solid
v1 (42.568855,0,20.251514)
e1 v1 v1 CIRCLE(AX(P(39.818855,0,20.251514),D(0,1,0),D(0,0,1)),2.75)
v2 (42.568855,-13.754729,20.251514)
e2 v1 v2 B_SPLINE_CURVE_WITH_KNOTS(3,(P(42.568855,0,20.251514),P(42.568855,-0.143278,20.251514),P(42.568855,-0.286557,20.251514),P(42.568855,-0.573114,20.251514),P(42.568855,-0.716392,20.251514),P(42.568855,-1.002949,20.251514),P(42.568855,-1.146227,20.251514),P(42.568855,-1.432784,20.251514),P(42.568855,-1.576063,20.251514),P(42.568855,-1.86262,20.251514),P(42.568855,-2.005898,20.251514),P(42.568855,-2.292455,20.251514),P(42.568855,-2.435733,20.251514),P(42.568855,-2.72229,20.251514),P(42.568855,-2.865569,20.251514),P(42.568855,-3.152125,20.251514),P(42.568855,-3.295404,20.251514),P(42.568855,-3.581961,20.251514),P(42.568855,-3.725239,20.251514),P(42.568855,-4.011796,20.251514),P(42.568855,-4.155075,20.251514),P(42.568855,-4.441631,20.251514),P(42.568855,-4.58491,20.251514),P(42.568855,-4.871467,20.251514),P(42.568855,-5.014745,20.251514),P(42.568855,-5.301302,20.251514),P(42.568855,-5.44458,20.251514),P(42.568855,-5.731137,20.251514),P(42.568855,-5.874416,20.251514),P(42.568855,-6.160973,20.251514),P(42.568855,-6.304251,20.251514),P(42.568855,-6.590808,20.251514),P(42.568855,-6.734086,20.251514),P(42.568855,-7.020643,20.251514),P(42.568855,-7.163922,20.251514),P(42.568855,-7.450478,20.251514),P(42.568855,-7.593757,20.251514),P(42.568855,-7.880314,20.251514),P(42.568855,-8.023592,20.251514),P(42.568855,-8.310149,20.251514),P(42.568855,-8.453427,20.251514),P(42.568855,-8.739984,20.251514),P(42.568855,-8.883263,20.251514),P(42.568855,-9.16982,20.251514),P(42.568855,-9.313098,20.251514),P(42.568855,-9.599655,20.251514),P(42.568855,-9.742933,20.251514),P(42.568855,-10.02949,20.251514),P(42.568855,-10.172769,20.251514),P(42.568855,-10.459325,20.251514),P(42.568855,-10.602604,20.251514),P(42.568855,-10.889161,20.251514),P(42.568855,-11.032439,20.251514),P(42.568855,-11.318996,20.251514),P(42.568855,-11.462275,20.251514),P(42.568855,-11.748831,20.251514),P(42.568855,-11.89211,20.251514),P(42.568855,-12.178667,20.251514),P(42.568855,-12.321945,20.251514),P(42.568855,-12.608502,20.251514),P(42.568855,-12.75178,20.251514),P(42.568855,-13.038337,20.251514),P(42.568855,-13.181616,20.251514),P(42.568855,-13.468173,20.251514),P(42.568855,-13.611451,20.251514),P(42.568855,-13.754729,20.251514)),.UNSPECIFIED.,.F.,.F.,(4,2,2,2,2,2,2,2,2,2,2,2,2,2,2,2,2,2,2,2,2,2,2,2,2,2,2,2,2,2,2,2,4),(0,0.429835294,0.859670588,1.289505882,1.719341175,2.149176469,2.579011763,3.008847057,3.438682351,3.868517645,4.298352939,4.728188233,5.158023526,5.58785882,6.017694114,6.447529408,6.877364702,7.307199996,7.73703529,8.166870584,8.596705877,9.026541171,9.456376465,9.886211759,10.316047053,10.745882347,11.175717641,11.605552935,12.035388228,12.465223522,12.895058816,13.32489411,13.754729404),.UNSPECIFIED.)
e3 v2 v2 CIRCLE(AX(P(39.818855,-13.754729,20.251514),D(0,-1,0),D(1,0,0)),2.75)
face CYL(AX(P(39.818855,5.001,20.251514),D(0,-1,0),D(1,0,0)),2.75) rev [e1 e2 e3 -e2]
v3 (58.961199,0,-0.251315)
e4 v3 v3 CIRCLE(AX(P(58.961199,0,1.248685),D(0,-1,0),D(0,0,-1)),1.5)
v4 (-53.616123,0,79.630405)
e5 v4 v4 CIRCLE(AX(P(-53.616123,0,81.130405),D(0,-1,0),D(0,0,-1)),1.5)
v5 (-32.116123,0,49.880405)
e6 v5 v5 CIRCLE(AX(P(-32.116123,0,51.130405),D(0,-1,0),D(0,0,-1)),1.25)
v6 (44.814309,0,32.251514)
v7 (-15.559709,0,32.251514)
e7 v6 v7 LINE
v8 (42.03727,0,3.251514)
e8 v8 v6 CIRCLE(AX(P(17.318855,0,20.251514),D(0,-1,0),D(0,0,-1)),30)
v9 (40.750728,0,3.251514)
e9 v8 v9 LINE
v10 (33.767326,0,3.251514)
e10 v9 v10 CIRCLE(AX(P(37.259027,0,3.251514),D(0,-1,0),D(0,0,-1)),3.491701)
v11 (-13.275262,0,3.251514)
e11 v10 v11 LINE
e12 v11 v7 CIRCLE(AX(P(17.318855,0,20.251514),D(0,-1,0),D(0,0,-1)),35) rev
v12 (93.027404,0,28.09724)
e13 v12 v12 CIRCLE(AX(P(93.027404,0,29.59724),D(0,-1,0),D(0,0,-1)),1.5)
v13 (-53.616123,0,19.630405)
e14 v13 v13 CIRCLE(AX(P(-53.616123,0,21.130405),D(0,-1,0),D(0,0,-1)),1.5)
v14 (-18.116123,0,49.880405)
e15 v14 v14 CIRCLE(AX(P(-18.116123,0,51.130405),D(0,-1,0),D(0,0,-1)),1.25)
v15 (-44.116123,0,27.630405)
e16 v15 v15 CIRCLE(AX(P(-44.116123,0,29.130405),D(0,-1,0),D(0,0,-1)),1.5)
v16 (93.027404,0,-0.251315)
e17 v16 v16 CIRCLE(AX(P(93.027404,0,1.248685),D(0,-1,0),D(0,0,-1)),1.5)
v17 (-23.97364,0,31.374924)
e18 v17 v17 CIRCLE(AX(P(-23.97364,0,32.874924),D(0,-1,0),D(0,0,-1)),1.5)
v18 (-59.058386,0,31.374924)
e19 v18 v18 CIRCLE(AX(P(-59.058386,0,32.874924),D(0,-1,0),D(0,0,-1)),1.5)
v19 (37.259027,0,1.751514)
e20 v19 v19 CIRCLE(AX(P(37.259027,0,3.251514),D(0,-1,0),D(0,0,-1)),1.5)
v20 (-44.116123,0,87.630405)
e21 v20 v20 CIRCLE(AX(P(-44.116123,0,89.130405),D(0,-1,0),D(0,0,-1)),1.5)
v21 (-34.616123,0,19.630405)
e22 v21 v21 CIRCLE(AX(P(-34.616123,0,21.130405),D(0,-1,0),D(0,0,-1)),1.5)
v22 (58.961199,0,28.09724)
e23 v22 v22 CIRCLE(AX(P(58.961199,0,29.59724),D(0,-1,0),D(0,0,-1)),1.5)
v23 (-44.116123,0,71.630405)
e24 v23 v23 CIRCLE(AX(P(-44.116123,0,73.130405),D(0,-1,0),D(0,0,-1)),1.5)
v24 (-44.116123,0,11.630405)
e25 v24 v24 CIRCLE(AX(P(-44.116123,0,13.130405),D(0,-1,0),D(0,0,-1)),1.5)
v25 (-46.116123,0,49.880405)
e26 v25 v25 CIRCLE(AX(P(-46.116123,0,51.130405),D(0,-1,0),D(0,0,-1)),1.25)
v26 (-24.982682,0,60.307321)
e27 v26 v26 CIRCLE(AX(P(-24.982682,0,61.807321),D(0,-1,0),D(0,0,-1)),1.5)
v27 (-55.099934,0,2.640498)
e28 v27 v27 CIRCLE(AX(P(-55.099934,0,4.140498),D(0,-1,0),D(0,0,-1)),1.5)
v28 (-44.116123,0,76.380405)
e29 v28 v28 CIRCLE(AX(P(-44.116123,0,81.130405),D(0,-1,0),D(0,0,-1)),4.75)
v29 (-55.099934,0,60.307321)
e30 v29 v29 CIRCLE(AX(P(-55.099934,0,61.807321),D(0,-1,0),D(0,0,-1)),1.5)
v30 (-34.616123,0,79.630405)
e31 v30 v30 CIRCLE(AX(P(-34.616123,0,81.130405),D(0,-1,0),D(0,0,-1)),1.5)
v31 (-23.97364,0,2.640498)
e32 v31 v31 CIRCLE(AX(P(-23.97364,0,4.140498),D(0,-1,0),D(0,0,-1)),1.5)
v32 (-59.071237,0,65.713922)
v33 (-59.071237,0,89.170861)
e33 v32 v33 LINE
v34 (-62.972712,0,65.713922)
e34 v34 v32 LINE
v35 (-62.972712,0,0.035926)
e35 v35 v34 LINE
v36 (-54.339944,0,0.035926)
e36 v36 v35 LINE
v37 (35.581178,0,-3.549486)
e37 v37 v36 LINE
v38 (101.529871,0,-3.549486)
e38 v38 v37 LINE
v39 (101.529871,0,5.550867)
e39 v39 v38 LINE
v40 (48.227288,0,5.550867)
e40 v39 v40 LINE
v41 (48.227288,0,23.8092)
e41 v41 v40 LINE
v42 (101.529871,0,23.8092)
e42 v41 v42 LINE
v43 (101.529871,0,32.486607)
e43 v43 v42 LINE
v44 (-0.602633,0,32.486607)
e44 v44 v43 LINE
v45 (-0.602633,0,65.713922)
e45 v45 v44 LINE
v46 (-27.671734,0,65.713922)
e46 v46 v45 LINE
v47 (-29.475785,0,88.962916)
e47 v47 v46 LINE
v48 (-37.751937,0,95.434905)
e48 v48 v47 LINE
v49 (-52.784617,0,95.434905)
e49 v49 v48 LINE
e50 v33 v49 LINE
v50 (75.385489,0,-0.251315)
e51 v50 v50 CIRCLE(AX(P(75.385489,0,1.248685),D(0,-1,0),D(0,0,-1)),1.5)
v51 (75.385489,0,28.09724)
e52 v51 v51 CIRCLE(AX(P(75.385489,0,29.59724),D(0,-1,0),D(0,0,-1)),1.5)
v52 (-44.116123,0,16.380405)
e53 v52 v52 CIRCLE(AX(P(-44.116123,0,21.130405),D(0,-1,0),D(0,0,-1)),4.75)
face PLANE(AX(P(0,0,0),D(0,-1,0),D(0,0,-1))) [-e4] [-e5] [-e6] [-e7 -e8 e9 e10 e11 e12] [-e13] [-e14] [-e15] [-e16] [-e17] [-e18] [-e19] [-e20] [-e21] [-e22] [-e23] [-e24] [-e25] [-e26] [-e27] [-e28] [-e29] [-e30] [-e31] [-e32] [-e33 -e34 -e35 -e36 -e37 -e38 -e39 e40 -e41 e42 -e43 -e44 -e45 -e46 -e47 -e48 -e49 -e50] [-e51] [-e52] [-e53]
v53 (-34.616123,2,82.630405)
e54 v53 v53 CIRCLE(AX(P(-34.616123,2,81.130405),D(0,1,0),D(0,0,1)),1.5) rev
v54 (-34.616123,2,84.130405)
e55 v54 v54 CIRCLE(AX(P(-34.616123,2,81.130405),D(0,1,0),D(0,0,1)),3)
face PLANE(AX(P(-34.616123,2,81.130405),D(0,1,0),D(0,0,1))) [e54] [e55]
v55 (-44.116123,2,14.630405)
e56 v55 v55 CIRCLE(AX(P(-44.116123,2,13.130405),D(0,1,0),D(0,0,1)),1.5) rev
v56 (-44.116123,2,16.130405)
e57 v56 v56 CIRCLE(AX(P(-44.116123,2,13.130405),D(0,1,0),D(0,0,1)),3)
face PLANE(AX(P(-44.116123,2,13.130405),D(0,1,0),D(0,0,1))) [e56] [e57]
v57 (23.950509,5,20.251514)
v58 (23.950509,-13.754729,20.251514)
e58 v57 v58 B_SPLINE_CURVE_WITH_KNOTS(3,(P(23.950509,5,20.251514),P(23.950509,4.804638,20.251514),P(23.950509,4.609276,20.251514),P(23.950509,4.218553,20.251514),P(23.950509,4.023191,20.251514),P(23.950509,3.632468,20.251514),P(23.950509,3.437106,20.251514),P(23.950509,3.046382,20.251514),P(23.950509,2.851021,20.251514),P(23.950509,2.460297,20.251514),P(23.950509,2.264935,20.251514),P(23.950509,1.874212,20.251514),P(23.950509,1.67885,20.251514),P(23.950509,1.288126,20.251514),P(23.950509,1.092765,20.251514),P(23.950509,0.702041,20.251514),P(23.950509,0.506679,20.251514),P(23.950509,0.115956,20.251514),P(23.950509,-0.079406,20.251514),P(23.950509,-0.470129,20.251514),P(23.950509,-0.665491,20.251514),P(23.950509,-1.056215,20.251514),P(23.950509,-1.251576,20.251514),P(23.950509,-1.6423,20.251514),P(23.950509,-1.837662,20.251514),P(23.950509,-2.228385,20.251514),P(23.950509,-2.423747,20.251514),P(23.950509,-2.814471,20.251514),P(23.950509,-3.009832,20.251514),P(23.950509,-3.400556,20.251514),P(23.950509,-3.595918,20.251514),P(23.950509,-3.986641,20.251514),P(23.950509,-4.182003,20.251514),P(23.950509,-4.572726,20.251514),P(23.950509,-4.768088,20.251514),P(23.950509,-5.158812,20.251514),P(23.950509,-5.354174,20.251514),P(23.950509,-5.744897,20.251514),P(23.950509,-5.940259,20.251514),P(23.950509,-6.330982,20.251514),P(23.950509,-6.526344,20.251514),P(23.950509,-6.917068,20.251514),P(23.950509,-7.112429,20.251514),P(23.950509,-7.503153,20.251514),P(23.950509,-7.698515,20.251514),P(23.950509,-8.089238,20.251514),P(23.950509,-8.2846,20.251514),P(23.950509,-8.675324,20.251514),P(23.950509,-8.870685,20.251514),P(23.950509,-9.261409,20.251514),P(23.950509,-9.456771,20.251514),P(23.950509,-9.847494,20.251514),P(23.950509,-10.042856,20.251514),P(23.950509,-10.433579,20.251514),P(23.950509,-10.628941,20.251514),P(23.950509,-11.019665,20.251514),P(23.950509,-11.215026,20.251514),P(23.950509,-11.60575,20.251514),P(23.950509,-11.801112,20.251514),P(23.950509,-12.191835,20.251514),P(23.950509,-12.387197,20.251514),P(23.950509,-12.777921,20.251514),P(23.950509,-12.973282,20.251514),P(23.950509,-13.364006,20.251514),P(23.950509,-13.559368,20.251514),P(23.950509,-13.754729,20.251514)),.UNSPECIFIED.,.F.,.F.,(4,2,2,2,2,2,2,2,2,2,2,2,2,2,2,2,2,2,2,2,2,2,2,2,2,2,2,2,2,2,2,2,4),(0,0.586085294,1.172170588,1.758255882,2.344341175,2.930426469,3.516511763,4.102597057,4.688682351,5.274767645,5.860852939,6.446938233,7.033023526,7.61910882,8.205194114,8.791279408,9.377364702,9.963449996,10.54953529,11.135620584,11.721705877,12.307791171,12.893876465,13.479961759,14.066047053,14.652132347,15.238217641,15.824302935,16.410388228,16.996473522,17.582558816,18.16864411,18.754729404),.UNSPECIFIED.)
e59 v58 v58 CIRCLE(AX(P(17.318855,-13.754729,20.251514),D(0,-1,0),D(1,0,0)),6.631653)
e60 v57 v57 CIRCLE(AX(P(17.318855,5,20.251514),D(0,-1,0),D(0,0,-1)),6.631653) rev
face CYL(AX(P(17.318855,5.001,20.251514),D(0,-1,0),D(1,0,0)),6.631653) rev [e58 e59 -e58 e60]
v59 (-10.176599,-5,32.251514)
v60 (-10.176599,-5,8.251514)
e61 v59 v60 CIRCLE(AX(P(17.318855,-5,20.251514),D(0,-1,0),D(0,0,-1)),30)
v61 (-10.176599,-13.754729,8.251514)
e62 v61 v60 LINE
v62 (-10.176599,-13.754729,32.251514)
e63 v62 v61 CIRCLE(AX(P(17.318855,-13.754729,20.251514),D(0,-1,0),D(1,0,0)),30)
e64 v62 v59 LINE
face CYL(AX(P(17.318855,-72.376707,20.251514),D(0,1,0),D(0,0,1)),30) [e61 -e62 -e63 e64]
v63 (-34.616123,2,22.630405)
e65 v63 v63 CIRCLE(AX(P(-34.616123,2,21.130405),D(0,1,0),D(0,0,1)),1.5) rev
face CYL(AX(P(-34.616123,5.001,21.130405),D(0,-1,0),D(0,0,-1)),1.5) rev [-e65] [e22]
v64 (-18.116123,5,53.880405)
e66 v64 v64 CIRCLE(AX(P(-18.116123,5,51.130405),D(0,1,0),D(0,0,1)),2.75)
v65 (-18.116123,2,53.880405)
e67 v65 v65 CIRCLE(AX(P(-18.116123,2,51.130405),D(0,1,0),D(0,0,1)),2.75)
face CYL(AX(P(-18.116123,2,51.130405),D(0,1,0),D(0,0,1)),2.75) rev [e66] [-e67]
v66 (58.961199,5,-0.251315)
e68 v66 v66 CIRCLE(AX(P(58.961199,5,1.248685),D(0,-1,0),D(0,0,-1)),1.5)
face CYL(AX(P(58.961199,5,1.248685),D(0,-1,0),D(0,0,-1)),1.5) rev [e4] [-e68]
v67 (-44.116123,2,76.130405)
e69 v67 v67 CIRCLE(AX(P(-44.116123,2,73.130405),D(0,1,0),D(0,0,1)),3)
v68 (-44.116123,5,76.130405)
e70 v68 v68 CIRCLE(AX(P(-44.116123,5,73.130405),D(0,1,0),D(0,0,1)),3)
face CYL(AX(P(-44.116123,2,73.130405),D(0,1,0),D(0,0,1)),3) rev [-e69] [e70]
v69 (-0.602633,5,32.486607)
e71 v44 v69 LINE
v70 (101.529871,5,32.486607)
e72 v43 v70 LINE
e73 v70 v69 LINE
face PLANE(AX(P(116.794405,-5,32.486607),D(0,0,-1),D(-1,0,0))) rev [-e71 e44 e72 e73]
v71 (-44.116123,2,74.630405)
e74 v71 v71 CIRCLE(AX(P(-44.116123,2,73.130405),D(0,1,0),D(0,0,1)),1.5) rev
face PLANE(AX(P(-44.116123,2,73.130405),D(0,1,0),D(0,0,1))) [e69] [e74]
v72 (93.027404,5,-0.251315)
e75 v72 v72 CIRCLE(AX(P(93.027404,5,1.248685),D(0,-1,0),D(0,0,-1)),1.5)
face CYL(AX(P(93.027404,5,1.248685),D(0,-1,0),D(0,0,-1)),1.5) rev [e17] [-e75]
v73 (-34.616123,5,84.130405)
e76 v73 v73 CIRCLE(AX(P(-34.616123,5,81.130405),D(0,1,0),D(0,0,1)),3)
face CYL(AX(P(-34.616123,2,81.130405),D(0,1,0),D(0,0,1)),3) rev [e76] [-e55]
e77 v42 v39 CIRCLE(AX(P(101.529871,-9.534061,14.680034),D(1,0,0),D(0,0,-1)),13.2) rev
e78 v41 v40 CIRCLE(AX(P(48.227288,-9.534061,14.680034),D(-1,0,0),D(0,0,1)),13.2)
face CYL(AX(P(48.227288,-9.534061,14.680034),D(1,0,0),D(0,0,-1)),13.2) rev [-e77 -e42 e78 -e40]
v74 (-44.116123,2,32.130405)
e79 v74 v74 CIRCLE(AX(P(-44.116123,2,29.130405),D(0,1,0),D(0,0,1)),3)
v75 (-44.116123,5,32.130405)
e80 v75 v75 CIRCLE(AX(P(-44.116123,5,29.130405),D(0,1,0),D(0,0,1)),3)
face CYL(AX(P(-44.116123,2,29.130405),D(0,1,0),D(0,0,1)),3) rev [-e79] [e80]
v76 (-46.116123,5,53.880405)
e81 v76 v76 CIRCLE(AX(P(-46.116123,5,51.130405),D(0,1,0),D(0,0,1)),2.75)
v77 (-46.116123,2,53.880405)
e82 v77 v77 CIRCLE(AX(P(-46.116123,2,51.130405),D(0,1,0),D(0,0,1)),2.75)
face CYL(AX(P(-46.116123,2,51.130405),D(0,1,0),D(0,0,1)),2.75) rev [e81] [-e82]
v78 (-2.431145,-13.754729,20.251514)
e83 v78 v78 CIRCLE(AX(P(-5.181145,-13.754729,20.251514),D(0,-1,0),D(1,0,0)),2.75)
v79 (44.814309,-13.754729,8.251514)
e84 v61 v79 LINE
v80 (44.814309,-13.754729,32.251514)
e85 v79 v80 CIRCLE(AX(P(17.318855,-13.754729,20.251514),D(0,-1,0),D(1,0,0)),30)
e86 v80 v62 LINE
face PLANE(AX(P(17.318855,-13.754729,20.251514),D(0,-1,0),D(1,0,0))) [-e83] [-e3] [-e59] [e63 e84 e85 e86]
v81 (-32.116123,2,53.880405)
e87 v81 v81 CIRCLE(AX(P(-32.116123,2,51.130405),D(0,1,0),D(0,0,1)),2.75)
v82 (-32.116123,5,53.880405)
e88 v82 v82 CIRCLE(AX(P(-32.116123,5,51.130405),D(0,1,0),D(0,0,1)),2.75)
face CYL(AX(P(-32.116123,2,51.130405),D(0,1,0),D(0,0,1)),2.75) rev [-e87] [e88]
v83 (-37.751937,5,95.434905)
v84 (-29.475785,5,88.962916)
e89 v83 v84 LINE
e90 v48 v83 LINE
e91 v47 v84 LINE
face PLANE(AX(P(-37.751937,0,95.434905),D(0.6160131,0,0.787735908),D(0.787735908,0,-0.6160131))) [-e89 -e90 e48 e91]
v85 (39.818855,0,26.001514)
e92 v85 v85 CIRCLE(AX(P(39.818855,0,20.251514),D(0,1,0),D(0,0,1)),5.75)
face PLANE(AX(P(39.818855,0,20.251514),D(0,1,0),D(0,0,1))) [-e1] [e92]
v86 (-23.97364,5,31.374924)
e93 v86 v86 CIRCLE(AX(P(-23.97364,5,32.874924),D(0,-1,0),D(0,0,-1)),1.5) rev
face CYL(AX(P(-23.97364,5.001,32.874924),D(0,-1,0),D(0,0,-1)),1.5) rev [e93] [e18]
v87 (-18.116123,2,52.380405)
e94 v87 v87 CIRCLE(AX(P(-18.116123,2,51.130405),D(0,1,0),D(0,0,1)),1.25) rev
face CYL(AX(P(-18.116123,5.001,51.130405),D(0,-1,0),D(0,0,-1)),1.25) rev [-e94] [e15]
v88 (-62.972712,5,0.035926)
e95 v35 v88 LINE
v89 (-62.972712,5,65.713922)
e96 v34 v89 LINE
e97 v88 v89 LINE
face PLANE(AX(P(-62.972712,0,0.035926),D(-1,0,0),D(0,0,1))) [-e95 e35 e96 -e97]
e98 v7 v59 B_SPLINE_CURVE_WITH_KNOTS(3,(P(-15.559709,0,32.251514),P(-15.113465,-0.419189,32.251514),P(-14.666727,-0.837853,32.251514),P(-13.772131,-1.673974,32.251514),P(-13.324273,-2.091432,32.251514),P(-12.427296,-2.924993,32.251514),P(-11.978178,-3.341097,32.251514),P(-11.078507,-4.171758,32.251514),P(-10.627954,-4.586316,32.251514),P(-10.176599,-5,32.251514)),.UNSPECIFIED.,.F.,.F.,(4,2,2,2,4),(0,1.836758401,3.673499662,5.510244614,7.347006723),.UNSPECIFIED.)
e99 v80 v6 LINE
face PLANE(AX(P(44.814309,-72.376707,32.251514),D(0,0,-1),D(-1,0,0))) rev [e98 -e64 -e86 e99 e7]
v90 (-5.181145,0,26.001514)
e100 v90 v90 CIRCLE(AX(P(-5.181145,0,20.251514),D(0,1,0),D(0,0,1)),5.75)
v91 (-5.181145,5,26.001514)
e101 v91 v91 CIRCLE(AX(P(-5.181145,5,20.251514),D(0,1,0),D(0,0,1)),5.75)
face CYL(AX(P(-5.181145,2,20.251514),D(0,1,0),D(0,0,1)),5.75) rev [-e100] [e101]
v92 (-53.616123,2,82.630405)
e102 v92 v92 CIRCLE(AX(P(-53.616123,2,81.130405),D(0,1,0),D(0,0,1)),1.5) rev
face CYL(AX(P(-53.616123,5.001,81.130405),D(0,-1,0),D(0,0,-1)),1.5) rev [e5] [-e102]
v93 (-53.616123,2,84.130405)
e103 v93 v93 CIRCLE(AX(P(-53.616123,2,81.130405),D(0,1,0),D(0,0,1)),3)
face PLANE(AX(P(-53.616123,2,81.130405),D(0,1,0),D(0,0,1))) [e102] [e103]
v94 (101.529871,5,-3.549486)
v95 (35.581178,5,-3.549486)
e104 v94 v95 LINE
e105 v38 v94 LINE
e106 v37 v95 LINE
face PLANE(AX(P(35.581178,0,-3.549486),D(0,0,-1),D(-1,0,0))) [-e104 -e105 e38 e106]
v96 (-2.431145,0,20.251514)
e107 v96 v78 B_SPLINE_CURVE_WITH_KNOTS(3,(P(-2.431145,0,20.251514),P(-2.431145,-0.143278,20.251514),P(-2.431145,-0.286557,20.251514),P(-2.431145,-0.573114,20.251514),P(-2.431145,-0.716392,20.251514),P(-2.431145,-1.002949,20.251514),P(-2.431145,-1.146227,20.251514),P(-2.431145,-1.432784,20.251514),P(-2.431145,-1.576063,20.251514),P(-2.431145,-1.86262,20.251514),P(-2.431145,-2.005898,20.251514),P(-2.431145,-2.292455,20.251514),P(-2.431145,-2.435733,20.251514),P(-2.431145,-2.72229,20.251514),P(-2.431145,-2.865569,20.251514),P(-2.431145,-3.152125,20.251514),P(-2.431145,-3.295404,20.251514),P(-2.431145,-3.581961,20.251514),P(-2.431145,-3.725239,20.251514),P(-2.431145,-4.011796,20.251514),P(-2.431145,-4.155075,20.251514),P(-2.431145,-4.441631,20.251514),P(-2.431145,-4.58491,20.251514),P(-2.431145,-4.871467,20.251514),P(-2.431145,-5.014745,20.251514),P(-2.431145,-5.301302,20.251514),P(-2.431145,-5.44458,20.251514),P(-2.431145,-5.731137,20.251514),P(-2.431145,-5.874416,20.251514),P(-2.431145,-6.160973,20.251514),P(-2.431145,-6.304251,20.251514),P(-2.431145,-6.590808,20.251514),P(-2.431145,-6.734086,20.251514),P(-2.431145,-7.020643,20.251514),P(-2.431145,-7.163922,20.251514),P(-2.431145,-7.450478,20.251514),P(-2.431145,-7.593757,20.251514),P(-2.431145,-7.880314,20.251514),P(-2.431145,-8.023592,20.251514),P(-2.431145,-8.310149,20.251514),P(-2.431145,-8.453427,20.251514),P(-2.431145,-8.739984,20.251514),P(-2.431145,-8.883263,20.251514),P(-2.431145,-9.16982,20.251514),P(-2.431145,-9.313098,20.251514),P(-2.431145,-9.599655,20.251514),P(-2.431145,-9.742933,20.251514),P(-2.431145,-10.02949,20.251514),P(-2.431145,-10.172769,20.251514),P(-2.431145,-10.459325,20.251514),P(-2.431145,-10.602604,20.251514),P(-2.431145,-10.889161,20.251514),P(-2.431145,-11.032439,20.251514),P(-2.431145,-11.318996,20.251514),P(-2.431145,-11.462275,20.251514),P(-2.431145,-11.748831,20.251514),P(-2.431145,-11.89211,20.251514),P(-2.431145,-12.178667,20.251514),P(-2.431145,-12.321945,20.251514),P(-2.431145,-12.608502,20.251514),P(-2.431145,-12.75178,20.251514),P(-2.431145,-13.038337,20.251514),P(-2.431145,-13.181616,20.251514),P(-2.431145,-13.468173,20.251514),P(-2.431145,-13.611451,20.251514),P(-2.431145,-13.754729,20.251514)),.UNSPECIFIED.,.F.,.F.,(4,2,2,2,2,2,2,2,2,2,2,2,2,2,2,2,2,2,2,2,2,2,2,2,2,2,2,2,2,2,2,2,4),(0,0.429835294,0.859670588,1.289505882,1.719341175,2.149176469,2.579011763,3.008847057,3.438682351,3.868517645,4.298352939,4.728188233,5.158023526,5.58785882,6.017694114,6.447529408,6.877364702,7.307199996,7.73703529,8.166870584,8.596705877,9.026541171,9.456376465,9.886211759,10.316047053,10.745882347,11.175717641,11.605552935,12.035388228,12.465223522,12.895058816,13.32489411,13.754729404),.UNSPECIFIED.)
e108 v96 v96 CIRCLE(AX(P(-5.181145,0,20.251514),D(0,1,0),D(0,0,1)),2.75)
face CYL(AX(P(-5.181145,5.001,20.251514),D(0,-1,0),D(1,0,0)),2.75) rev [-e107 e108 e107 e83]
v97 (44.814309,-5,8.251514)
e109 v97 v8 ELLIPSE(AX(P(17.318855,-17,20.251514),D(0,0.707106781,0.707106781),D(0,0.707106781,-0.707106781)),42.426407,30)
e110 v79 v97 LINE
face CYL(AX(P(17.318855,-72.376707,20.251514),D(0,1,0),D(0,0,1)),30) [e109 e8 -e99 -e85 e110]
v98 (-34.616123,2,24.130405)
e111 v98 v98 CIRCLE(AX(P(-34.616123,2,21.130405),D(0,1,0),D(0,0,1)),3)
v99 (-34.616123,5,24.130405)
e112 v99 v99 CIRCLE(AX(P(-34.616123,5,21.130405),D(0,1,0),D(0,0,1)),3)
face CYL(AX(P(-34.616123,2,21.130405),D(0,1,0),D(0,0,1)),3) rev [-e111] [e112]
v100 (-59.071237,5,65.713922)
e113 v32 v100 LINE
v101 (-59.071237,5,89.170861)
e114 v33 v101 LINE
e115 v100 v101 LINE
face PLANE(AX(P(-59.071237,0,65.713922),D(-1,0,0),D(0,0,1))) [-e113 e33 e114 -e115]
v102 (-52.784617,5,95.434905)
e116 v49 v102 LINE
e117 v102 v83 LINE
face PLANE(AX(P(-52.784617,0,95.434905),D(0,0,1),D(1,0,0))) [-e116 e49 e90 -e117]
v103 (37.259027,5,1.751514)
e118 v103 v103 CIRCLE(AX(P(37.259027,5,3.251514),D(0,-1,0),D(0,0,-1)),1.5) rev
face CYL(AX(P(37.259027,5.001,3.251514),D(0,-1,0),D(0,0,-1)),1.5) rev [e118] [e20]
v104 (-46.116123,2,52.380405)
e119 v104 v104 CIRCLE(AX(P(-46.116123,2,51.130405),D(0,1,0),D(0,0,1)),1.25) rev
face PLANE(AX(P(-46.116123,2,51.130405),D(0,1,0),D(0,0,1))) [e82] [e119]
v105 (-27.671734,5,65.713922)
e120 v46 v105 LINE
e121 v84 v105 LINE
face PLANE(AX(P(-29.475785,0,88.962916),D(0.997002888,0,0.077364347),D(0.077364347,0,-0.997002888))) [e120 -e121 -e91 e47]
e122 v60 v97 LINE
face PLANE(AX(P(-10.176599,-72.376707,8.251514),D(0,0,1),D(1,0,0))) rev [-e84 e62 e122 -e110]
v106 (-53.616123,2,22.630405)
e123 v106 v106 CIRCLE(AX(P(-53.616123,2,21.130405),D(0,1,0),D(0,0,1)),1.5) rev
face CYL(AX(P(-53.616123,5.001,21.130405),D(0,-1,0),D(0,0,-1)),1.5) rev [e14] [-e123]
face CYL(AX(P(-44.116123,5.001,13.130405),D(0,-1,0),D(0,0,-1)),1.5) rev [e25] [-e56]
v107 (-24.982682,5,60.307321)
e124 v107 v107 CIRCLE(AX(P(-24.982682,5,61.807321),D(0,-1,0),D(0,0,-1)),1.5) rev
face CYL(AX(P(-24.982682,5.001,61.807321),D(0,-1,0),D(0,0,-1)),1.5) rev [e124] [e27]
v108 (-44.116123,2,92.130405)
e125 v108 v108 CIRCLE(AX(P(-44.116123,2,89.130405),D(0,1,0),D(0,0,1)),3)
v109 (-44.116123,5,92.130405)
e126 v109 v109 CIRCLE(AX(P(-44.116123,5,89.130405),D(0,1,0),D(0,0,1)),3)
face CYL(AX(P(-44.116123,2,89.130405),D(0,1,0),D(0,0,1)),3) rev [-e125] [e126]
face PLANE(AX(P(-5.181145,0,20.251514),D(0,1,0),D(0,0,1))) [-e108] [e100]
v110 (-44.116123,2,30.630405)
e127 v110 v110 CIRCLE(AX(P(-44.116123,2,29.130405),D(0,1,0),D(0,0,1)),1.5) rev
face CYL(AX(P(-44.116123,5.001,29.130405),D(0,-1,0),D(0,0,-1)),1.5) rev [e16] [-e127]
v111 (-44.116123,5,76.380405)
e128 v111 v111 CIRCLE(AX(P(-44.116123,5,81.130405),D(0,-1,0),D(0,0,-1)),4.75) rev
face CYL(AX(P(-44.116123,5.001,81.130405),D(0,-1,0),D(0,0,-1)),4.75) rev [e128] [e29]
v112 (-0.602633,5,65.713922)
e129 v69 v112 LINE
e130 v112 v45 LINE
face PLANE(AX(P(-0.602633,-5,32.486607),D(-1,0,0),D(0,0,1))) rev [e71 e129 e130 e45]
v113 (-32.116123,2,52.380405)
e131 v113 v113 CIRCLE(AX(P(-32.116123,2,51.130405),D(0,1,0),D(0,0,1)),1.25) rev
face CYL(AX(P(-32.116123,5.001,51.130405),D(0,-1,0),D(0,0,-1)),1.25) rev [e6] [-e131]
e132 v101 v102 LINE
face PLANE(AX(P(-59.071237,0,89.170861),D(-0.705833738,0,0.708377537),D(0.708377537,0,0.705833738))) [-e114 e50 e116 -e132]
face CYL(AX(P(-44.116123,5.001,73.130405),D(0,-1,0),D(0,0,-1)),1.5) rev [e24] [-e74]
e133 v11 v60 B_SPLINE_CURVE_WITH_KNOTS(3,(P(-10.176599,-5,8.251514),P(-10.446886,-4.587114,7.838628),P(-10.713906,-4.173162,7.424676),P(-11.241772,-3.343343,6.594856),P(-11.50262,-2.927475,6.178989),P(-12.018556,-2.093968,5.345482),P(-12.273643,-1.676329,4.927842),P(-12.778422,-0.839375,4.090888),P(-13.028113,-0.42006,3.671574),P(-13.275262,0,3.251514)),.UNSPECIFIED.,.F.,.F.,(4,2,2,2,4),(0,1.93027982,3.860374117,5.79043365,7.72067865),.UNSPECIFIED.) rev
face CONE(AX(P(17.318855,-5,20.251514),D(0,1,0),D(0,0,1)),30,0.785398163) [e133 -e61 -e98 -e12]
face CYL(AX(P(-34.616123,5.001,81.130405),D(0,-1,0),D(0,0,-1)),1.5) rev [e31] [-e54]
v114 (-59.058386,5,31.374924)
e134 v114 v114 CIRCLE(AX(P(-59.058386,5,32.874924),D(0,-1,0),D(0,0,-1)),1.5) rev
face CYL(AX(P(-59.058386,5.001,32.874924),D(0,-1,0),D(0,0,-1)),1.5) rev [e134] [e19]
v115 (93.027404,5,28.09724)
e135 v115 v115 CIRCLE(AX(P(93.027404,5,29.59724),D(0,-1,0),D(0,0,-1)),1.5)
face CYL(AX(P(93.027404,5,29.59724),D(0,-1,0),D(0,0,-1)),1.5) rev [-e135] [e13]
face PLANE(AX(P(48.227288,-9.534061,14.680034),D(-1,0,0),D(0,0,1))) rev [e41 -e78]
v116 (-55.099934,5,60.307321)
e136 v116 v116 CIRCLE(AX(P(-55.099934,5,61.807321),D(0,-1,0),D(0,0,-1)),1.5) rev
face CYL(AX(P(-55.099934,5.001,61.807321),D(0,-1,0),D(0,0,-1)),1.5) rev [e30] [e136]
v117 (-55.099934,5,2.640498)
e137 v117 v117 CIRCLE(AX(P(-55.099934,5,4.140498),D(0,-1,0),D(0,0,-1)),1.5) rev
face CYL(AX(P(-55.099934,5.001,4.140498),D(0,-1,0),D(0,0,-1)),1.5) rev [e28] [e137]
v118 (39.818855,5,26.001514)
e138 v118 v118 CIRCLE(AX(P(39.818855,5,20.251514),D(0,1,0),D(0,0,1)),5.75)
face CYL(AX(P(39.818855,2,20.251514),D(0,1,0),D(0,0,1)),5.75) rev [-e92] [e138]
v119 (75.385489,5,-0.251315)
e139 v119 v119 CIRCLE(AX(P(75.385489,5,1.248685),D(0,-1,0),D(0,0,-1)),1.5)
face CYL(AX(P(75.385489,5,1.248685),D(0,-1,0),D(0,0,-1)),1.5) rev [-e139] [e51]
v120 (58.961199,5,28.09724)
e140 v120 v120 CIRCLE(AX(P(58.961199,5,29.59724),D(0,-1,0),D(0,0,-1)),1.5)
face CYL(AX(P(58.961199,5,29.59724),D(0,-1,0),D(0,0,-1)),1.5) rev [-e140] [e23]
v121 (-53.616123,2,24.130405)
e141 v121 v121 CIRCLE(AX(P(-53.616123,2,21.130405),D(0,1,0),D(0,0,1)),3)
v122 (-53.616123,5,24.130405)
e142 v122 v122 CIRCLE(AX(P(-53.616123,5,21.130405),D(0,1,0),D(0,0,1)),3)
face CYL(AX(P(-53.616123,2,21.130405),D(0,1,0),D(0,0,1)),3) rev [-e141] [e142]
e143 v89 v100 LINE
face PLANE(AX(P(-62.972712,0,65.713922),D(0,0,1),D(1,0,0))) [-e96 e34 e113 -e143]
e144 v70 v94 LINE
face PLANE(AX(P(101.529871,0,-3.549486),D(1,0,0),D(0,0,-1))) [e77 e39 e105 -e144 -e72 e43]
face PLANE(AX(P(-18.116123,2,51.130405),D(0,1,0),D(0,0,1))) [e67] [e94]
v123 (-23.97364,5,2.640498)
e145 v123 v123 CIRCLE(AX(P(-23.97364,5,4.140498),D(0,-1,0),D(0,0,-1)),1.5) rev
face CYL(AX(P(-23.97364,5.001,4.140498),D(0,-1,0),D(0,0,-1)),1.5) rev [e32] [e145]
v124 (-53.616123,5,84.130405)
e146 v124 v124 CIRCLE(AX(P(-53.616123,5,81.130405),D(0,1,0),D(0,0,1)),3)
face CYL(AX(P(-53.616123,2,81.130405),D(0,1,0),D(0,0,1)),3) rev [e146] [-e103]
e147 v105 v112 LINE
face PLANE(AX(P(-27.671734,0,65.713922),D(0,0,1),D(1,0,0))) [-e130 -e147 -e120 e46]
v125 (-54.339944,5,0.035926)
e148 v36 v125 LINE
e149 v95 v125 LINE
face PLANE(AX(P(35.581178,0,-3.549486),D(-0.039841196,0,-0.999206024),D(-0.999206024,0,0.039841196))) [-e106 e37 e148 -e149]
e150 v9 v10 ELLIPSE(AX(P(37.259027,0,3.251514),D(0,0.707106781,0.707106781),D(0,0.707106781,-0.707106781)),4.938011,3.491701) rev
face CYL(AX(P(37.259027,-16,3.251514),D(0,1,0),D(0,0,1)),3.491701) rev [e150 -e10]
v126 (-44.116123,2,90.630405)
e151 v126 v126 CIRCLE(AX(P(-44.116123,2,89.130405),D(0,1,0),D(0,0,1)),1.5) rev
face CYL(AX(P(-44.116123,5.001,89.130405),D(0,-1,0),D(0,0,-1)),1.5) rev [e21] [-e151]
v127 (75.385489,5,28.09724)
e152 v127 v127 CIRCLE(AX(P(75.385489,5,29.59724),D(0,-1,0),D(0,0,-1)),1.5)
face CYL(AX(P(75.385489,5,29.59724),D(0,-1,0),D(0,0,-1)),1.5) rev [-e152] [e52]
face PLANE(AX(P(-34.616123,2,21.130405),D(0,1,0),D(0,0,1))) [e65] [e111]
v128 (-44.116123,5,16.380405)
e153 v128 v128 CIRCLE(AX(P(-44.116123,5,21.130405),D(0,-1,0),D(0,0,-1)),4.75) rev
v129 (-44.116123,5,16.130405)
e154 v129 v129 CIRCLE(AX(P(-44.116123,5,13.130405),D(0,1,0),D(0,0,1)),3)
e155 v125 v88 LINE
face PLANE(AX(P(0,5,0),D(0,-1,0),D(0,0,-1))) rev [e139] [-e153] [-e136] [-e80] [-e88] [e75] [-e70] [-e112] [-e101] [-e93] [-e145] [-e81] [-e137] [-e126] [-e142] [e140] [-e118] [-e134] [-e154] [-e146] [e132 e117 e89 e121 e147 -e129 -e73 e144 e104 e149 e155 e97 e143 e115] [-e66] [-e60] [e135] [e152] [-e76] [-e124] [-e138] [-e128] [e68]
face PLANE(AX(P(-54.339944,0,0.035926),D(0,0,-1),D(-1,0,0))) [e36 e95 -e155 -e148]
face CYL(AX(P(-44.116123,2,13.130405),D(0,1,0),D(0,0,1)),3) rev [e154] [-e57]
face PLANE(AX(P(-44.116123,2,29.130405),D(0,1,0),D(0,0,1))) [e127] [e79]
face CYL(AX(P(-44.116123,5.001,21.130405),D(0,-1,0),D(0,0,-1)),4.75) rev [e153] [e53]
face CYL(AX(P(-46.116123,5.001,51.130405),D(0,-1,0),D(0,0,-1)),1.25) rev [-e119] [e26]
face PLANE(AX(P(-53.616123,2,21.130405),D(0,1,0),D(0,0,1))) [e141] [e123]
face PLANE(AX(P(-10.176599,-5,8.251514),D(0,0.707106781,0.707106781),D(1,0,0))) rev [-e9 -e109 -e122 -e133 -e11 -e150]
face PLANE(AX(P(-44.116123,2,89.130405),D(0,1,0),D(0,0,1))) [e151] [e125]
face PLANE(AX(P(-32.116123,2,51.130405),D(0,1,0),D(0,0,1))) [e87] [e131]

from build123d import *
from build123d.topology import SkipClean

# Parameters (mm, degrees)
BOSS_EXTRUDE2_DEPTH      = 5
BOSS_EXTRUDE3_DEPTH      = 7.754729404
CHAMFER1_SIZE            = 5
CUT_EXTRUDE1_REACH       = 141.557
SKETCH3_R                = 1.25
SKETCH3_R_2              = 4.75
SKETCH3_R_3              = 1.5
CUT_EXTRUDE2_REACH       = 141.924
SKETCH4_R                = 6.631653289
SKETCH5_R                = 1.5
SKETCH5_R_2              = 1.25
CUT_EXTRUDE3_DEPTH       = 5
SKETCH6_R                = 3.491700942
CUT_EXTRUDE4_DEPTH       = 16
SKETCH7_R                = 3
SKETCH7_R_2              = 2.75
SKETCH7_R_3              = 5.75
CUT_EXTRUDE5_DEPTH       = 3
SKETCH8_R                = 5.75
SKETCH8_R_2              = 2.75
CUT_EXTRUDE6_DEPTH       = 2
SKETCH9_R                = 2.75
SKETCH9_R_2              = 6.631653289
BOSS_EXTRUDE4_DEPTH      = 6
SKETCH_2_W               = 117.397038357
SKETCH_2_H               = 38.743798428
CUT_EXTRUDE_1_DEPTH      = 10
CUT_EXTRUDE_2_DEPTH      = 4
CUT_EXTRUDE_2_DEPTH_BACK = 67
SKETCH_3_R               = 13.2
SKETCH_4_R               = 1.5
CUT_EXTRUDE_3_DEPTH      = 141.019029031


with BuildPart() as part:
    # Sketch1 → Boss-Extrude2 (new body)
    with BuildSketch(Plane(origin=(0, 5, 0), x_dir=(1, 0, 0), z_dir=(0, 1, 0))):
        Polygon((-59.07123662, -89.170861083), (-52.784617119, -95.434905202), (-37.7519372, -95.434905202), (-29.475784547, -88.962915789), (-27.671734368, -65.713921864), (18.946867386, -65.713921864), (44.47116766, -32.695405711), (101.529871362, -32.695405711), (101.529871362, 3.549485717), (35.581177978, 3.549485717), (-54.339944406, -0.035926105), (-62.97271212, -0.035926105), (-62.97271212, -65.713921864), (-59.07123662, -65.713921864), align=None)
    extrude(amount=-BOSS_EXTRUDE2_DEPTH)

    # Sketch2 → Boss-Extrude3 (add)
    with BuildSketch(Plane.XZ):
        with BuildLine():
            Line((-10.176598849, 8.251513657), (44.814309491, 8.251513657))
            ThreePointArc((44.814309491, 8.251513657), (46.686044709, 14.122224346), (47.318855321, 20.251513657))
            ThreePointArc((47.318855321, 20.251513657), (46.686044709, 26.380802967), (44.814309491, 32.251513657))
            Line((44.814309491, 32.251513657), (-10.176598849, 32.251513657))
            ThreePointArc((-10.176598849, 32.251513657), (-12.681144679, 20.251513657), (-10.176598849, 8.251513657))
        make_face()
    extrude(amount=BOSS_EXTRUDE3_DEPTH)

    # Chamfer1
    chamfer1_edges = [part.edges().sort_by_distance(p)[0] for p in [
        (-12.681144679, 0, 20.251513657),
        (17.318855321, 0, 8.251513657),
    ]]
    chamfer(chamfer1_edges, length=CHAMFER1_SIZE)

    # Sketch3 → Cut-Extrude1 (cut, up to next)
    with BuildSketch(Plane.XZ, mode=Mode.PRIVATE) as cut_extrude1_sk1:
        with Locations(Location((-18.116122786, 51.13040511, 0), (0, 0, 270))):
            Circle(SKETCH3_R)
    cut_extrude1_tool1 = extrude(cut_extrude1_sk1.sketch, amount=-CUT_EXTRUDE1_REACH, mode=Mode.PRIVATE) & part.part
    # Sketch3 → Cut-Extrude1 (cut, up to next)
    with BuildSketch(Plane.XZ, mode=Mode.PRIVATE) as cut_extrude1_sk2:
        with Locations(Location((-32.116122786, 51.13040511, 0), (0, 0, 270))):
            Circle(SKETCH3_R)
    cut_extrude1_tool2 = extrude(cut_extrude1_sk2.sketch, amount=-CUT_EXTRUDE1_REACH, mode=Mode.PRIVATE) & part.part
    # Sketch3 → Cut-Extrude1 (cut, up to next)
    with BuildSketch(Plane.XZ, mode=Mode.PRIVATE) as cut_extrude1_sk3:
        with Locations(Location((-46.116122786, 51.13040511, 0), (0, 0, 270))):
            Circle(SKETCH3_R)
    cut_extrude1_tool3 = extrude(cut_extrude1_sk3.sketch, amount=-CUT_EXTRUDE1_REACH, mode=Mode.PRIVATE) & part.part
    # Sketch3 → Cut-Extrude1 (cut, up to next)
    with BuildSketch(Plane.XZ, mode=Mode.PRIVATE) as cut_extrude1_sk4:
        with Locations(Location((-44.116122786, 21.13040511, 0), (0, 0, 270))):
            Circle(SKETCH3_R_2)
    cut_extrude1_tool4 = extrude(cut_extrude1_sk4.sketch, amount=-CUT_EXTRUDE1_REACH, mode=Mode.PRIVATE) & part.part
    # Sketch3 → Cut-Extrude1 (cut, up to next)
    with BuildSketch(Plane.XZ, mode=Mode.PRIVATE) as cut_extrude1_sk5:
        with Locations(Location((-44.116122786, 81.13040511, 0), (0, 0, 270))):
            Circle(SKETCH3_R_2)
    cut_extrude1_tool5 = extrude(cut_extrude1_sk5.sketch, amount=-CUT_EXTRUDE1_REACH, mode=Mode.PRIVATE) & part.part
    # Sketch3 → Cut-Extrude1 (cut, up to next)
    with BuildSketch(Plane.XZ, mode=Mode.PRIVATE) as cut_extrude1_sk6:
        with Locations(Location((-34.616122786, 81.13040511, 0), (0, 0, 270))):
            Circle(SKETCH3_R_3)
    cut_extrude1_tool6 = extrude(cut_extrude1_sk6.sketch, amount=-CUT_EXTRUDE1_REACH, mode=Mode.PRIVATE) & part.part
    # Sketch3 → Cut-Extrude1 (cut, up to next)
    with BuildSketch(Plane.XZ, mode=Mode.PRIVATE) as cut_extrude1_sk7:
        with Locations(Location((-44.116122786, 73.13040511, 0), (0, 0, 270))):
            Circle(SKETCH3_R_3)
    cut_extrude1_tool7 = extrude(cut_extrude1_sk7.sketch, amount=-CUT_EXTRUDE1_REACH, mode=Mode.PRIVATE) & part.part
    # Sketch3 → Cut-Extrude1 (cut, up to next)
    with BuildSketch(Plane.XZ, mode=Mode.PRIVATE) as cut_extrude1_sk8:
        with Locations(Location((-53.616122786, 81.13040511, 0), (0, 0, 270))):
            Circle(SKETCH3_R_3)
    cut_extrude1_tool8 = extrude(cut_extrude1_sk8.sketch, amount=-CUT_EXTRUDE1_REACH, mode=Mode.PRIVATE) & part.part
    # Sketch3 → Cut-Extrude1 (cut, up to next)
    with BuildSketch(Plane.XZ, mode=Mode.PRIVATE) as cut_extrude1_sk9:
        with Locations(Location((-44.116122786, 89.13040511, 0), (0, 0, 270))):
            Circle(SKETCH3_R_3)
    cut_extrude1_tool9 = extrude(cut_extrude1_sk9.sketch, amount=-CUT_EXTRUDE1_REACH, mode=Mode.PRIVATE) & part.part
    # Sketch3 → Cut-Extrude1 (cut, up to next)
    with BuildSketch(Plane.XZ, mode=Mode.PRIVATE) as cut_extrude1_sk10:
        with Locations(Location((-53.616122786, 21.13040511, 0), (0, 0, 270))):
            Circle(SKETCH3_R_3)
    cut_extrude1_tool10 = extrude(cut_extrude1_sk10.sketch, amount=-CUT_EXTRUDE1_REACH, mode=Mode.PRIVATE) & part.part
    # Sketch3 → Cut-Extrude1 (cut, up to next)
    with BuildSketch(Plane.XZ, mode=Mode.PRIVATE) as cut_extrude1_sk11:
        with Locations(Location((-44.116122786, 13.13040511, 0), (0, 0, 270))):
            Circle(SKETCH3_R_3)
    cut_extrude1_tool11 = extrude(cut_extrude1_sk11.sketch, amount=-CUT_EXTRUDE1_REACH, mode=Mode.PRIVATE) & part.part
    # Sketch3 → Cut-Extrude1 (cut, up to next)
    with BuildSketch(Plane.XZ, mode=Mode.PRIVATE) as cut_extrude1_sk12:
        with Locations(Location((-34.616122786, 21.13040511, 0), (0, 0, 270))):
            Circle(SKETCH3_R_3)
    cut_extrude1_tool12 = extrude(cut_extrude1_sk12.sketch, amount=-CUT_EXTRUDE1_REACH, mode=Mode.PRIVATE) & part.part
    # Sketch3 → Cut-Extrude1 (cut, up to next)
    with BuildSketch(Plane.XZ, mode=Mode.PRIVATE) as cut_extrude1_sk13:
        with Locations(Location((-44.116122786, 29.13040511, 0), (0, 0, 270))):
            Circle(SKETCH3_R_3)
    cut_extrude1_tool13 = extrude(cut_extrude1_sk13.sketch, amount=-CUT_EXTRUDE1_REACH, mode=Mode.PRIVATE) & part.part
    add(cut_extrude1_tool1.solids().sort_by_distance((-18.116123, 0, 51.130405))[0], mode=Mode.SUBTRACT)
    add(cut_extrude1_tool2.solids().sort_by_distance((-32.116123, 0, 51.130405))[0], mode=Mode.SUBTRACT)
    add(cut_extrude1_tool3.solids().sort_by_distance((-46.116123, 0, 51.130405))[0], mode=Mode.SUBTRACT)
    add(cut_extrude1_tool4.solids().sort_by_distance((-44.116123, 0, 21.130405))[0], mode=Mode.SUBTRACT)
    add(cut_extrude1_tool5.solids().sort_by_distance((-44.116123, 0, 81.130405))[0], mode=Mode.SUBTRACT)
    add(cut_extrude1_tool6.solids().sort_by_distance((-34.616123, 0, 81.130405))[0], mode=Mode.SUBTRACT)
    add(cut_extrude1_tool7.solids().sort_by_distance((-44.116123, 0, 73.130405))[0], mode=Mode.SUBTRACT)
    add(cut_extrude1_tool8.solids().sort_by_distance((-53.616123, 0, 81.130405))[0], mode=Mode.SUBTRACT)
    add(cut_extrude1_tool9.solids().sort_by_distance((-44.116123, 0, 89.130405))[0], mode=Mode.SUBTRACT)
    add(cut_extrude1_tool10.solids().sort_by_distance((-53.616123, 0, 21.130405))[0], mode=Mode.SUBTRACT)
    add(cut_extrude1_tool11.solids().sort_by_distance((-44.116123, 0, 13.130405))[0], mode=Mode.SUBTRACT)
    add(cut_extrude1_tool12.solids().sort_by_distance((-34.616123, 0, 21.130405))[0], mode=Mode.SUBTRACT)
    add(cut_extrude1_tool13.solids().sort_by_distance((-44.116123, 0, 29.130405))[0], mode=Mode.SUBTRACT)

    # Sketch4 → Cut-Extrude2 (cut, up to next)
    with BuildSketch(Plane.XZ.offset(7.754729404), mode=Mode.PRIVATE) as cut_extrude2_sk1:
        with Locations((17.318855321, 20.251513657)):
            Circle(SKETCH4_R)
    cut_extrude2_tool1 = extrude(cut_extrude2_sk1.sketch, amount=-CUT_EXTRUDE2_REACH, mode=Mode.PRIVATE) & part.part
    # Sketch4 → Cut-Extrude2 (cut, up to next)
    with BuildSketch(Plane.XZ.offset(7.754729404), mode=Mode.PRIVATE) as cut_extrude2_sk2:
        with BuildLine():
            ThreePointArc((-2.431144679, 20.251513657), (-5.181144679, 23.001513657), (-7.931144679, 20.251513657))
            ThreePointArc((-7.931144679, 20.251513657), (-5.181144679, 17.501513657), (-2.431144679, 20.251513657))
        make_face()
    cut_extrude2_tool2 = extrude(cut_extrude2_sk2.sketch, amount=-CUT_EXTRUDE2_REACH, mode=Mode.PRIVATE) & part.part
    # Sketch4 → Cut-Extrude2 (cut, up to next)
    with BuildSketch(Plane.XZ.offset(7.754729404), mode=Mode.PRIVATE) as cut_extrude2_sk3:
        with BuildLine():
            ThreePointArc((37.068855321, 20.251513657), (39.818855321, 17.501513657), (42.568855321, 20.251513657))
            ThreePointArc((42.568855321, 20.251513657), (39.818855321, 23.001513657), (37.068855321, 20.251513657))
        make_face()
    cut_extrude2_tool3 = extrude(cut_extrude2_sk3.sketch, amount=-CUT_EXTRUDE2_REACH, mode=Mode.PRIVATE) & part.part
    add(cut_extrude2_tool1.solids().sort_by_distance((17.318855, -7.754729, 20.251514))[0], mode=Mode.SUBTRACT)
    add(cut_extrude2_tool2.solids().sort_by_distance((-5.181145, -7.754729, 20.251514))[0], mode=Mode.SUBTRACT)
    add(cut_extrude2_tool3.solids().sort_by_distance((39.818855, -7.754729, 20.251514))[0], mode=Mode.SUBTRACT)

    # Sketch5 → Cut-Extrude3 (cut)
    with BuildSketch(Plane(origin=(0, 0, 0), x_dir=(-1, 0, 0), z_dir=(0, -1, 0))):
        with Locations(Location((55.099934193, -4.140497737, 0), (0, 0, 90))):
            Circle(SKETCH5_R)
        with Locations(Location((59.058385613, -32.874923984, 0), (0, 0, 90))):
            Circle(SKETCH5_R)
        with Locations(Location((23.973639777, -4.140497737, 0), (0, 0, 90))):
            Circle(SKETCH5_R)
        with Locations(Location((23.973639777, -32.874923984, 0), (0, 0, 90))):
            Circle(SKETCH5_R)
        with Locations(Location((-37.259026719, -36.796202548, 0), (0, 0, 90))):
            Circle(SKETCH5_R)
        with Locations(Location((-14.468099575, -36.796202548, 0), (0, 0, 90))):
            Circle(SKETCH5_R)
        with Locations(Location((18.116122786, -51.13040511, 0), (0, 0, 90))):
            Circle(SKETCH5_R_2)
        with Locations(Location((32.116122786, -51.13040511, 0), (0, 0, 90))):
            Circle(SKETCH5_R_2)
        with Locations(Location((46.116122786, -51.13040511, 0), (0, 0, 90))):
            Circle(SKETCH5_R_2)
        with Locations(Location((55.099934193, -61.807320837, 0), (0, 0, 90))):
            Circle(SKETCH5_R)
        with Locations(Location((24.982681883, -61.807320837, 0), (0, 0, 90))):
            Circle(SKETCH5_R)
        with Locations(Location((-16.884070867, -61.807320837, 0), (0, 0, 90))):
            Circle(SKETCH5_R)
        with Locations(Location((-37.259026719, -3.251513657, 0), (0, 0, 90))):
            Circle(SKETCH5_R)
    extrude(amount=-CUT_EXTRUDE3_DEPTH, mode=Mode.SUBTRACT)

    # Sketch6 → Cut-Extrude4 (cut)
    with BuildSketch(Plane.XZ):
        with Locations((37.259026719, 3.251513657)):
            Circle(SKETCH6_R)
    extrude(amount=CUT_EXTRUDE4_DEPTH, mode=Mode.SUBTRACT)

    # Sketch7 → Cut-Extrude5 (cut)
    with BuildSketch(Plane(origin=(0, 5, 0), x_dir=(1, 0, 0), z_dir=(0, 1, 0))):
        with Locations(Location((-44.116122786, -89.13040511, 0), (0, 0, 270))):
            Circle(SKETCH7_R)
        with Locations(Location((-34.616122786, -81.13040511, 0), (0, 0, 270))):
            Circle(SKETCH7_R)
        with Locations(Location((-53.616122786, -81.13040511, 0), (0, 0, 270))):
            Circle(SKETCH7_R)
        with Locations(Location((-44.116122786, -73.13040511, 0), (0, 0, 270))):
            Circle(SKETCH7_R)
        with Locations(Location((-44.116122786, -29.13040511, 0), (0, 0, 270))):
            Circle(SKETCH7_R)
        with Locations(Location((-34.616122786, -21.13040511, 0), (0, 0, 270))):
            Circle(SKETCH7_R)
        with Locations(Location((-53.616122786, -21.13040511, 0), (0, 0, 270))):
            Circle(SKETCH7_R)
        with Locations(Location((-44.116122786, -13.13040511, 0), (0, 0, 270))):
            Circle(SKETCH7_R)
        with Locations(Location((-18.116122786, -51.13040511, 0), (0, 0, 270))):
            Circle(SKETCH7_R_2)
        with Locations(Location((-32.116122786, -51.13040511, 0), (0, 0, 270))):
            Circle(SKETCH7_R_2)
        with Locations(Location((-46.116122786, -51.13040511, 0), (0, 0, 270))):
            Circle(SKETCH7_R_2)
        with Locations(Location((39.818855321, -20.251513657, 0), (0, 0, 270))):
            Circle(SKETCH7_R_3)
        with Locations(Location((-5.181144679, -20.251513657, 0), (0, 0, 270))):
            Circle(SKETCH7_R_3)
    extrude(amount=-CUT_EXTRUDE5_DEPTH, mode=Mode.SUBTRACT)

    # Sketch8 → Cut-Extrude6 (cut)
    # profile 1 of 2: a face of its own
    with BuildSketch(Plane(origin=(0, 2, 0), x_dir=(1, 0, 0), z_dir=(0, 1, 0))):
        with Locations(Location((-5.181144679, -20.251513657, 0), (0, 0, 270))):
            Circle(SKETCH8_R)
        with Locations((-5.181144679, -20.251513657)):
            Circle(SKETCH8_R_2, mode=Mode.SUBTRACT)
    # profile 2 of 2: a face of its own
    with BuildSketch(Plane(origin=(0, 2, 0), x_dir=(1, 0, 0), z_dir=(0, 1, 0))):
        with Locations(Location((39.818855321, -20.251513657, 0), (0, 0, 270))):
            Circle(SKETCH8_R)
        with Locations((39.818855321, -20.251513657)):
            Circle(SKETCH8_R_2, mode=Mode.SUBTRACT)
    extrude(amount=-CUT_EXTRUDE6_DEPTH, mode=Mode.SUBTRACT)

    # Sketch9 → Boss-Extrude4 (add)
    with SkipClean():  # the faces are left unmerged after this step: merging them gives an invalid solid
        with BuildSketch(Plane.XZ.offset(7.754729404)):
            with BuildLine():
                Line((-10.176598849, 8.251513657), (44.814309491, 8.251513657))
                ThreePointArc((44.814309491, 8.251513657), (47.318855321, 20.251513657), (44.814309491, 32.251513657))
                Line((44.814309491, 32.251513657), (-10.176598849, 32.251513657))
                ThreePointArc((-10.176598849, 32.251513657), (-12.681144679, 20.251513657), (-10.176598849, 8.251513657))
            make_face()
            with Locations((-5.181144679, 20.251513657)):
                Circle(SKETCH9_R, mode=Mode.SUBTRACT)
            with Locations((39.818855321, 20.251513657)):
                Circle(SKETCH9_R, mode=Mode.SUBTRACT)
            with Locations((17.318855321, 20.251513657)):
                Circle(SKETCH9_R_2, mode=Mode.SUBTRACT)
        extrude(amount=BOSS_EXTRUDE4_DEPTH)
    add(part.part.scale(1), mode=Mode.REPLACE)  # the faces are merged on a copy

    # 草图2 → 切除-拉伸1 (cut)
    with BuildSketch(Plane(origin=(0, 5, 0), x_dir=(1, 0, 0), z_dir=(0, 1, 0))):
        with Locations((58.095885681, -51.858505896)):
            Rectangle(SKETCH_2_W, SKETCH_2_H)
    extrude(amount=-CUT_EXTRUDE_1_DEPTH, mode=Mode.SUBTRACT)

    # 草图3 → 切除-拉伸2 (cut, two sides: drawn at the far end of the back side and taken through both)
    with BuildSketch(Plane.ZY.offset(-52.22728788).offset(-CUT_EXTRUDE_2_DEPTH_BACK)):
        with Locations((14.680033502, -9.534061002)):
            Circle(SKETCH_3_R)
    extrude(amount=CUT_EXTRUDE_2_DEPTH + CUT_EXTRUDE_2_DEPTH_BACK, mode=Mode.SUBTRACT)

    # 草图4 → 切除-拉伸3 (cut, through all)
    with BuildSketch(Plane.XZ):
        with Locations(Location((75.385488533, 1.248685424, 0), (0, 0, 270))):
            Circle(SKETCH_4_R)
        with Locations(Location((58.961198533, 1.248685424, 0), (0, 0, 270))):
            Circle(SKETCH_4_R)
        with Locations(Location((93.027403988, 1.248685424, 0), (0, 0, 270))):
            Circle(SKETCH_4_R)
        with Locations(Location((93.027403988, 29.597239809, 0), (0, 0, 270))):
            Circle(SKETCH_4_R)
        with Locations(Location((75.385488533, 29.597239809, 0), (0, 0, 270))):
            Circle(SKETCH_4_R)
        with Locations(Location((58.961198533, 29.597239809, 0), (0, 0, 270))):
            Circle(SKETCH_4_R)
    extrude(amount=-CUT_EXTRUDE_3_DEPTH, mode=Mode.SUBTRACT)


solid = part.part
